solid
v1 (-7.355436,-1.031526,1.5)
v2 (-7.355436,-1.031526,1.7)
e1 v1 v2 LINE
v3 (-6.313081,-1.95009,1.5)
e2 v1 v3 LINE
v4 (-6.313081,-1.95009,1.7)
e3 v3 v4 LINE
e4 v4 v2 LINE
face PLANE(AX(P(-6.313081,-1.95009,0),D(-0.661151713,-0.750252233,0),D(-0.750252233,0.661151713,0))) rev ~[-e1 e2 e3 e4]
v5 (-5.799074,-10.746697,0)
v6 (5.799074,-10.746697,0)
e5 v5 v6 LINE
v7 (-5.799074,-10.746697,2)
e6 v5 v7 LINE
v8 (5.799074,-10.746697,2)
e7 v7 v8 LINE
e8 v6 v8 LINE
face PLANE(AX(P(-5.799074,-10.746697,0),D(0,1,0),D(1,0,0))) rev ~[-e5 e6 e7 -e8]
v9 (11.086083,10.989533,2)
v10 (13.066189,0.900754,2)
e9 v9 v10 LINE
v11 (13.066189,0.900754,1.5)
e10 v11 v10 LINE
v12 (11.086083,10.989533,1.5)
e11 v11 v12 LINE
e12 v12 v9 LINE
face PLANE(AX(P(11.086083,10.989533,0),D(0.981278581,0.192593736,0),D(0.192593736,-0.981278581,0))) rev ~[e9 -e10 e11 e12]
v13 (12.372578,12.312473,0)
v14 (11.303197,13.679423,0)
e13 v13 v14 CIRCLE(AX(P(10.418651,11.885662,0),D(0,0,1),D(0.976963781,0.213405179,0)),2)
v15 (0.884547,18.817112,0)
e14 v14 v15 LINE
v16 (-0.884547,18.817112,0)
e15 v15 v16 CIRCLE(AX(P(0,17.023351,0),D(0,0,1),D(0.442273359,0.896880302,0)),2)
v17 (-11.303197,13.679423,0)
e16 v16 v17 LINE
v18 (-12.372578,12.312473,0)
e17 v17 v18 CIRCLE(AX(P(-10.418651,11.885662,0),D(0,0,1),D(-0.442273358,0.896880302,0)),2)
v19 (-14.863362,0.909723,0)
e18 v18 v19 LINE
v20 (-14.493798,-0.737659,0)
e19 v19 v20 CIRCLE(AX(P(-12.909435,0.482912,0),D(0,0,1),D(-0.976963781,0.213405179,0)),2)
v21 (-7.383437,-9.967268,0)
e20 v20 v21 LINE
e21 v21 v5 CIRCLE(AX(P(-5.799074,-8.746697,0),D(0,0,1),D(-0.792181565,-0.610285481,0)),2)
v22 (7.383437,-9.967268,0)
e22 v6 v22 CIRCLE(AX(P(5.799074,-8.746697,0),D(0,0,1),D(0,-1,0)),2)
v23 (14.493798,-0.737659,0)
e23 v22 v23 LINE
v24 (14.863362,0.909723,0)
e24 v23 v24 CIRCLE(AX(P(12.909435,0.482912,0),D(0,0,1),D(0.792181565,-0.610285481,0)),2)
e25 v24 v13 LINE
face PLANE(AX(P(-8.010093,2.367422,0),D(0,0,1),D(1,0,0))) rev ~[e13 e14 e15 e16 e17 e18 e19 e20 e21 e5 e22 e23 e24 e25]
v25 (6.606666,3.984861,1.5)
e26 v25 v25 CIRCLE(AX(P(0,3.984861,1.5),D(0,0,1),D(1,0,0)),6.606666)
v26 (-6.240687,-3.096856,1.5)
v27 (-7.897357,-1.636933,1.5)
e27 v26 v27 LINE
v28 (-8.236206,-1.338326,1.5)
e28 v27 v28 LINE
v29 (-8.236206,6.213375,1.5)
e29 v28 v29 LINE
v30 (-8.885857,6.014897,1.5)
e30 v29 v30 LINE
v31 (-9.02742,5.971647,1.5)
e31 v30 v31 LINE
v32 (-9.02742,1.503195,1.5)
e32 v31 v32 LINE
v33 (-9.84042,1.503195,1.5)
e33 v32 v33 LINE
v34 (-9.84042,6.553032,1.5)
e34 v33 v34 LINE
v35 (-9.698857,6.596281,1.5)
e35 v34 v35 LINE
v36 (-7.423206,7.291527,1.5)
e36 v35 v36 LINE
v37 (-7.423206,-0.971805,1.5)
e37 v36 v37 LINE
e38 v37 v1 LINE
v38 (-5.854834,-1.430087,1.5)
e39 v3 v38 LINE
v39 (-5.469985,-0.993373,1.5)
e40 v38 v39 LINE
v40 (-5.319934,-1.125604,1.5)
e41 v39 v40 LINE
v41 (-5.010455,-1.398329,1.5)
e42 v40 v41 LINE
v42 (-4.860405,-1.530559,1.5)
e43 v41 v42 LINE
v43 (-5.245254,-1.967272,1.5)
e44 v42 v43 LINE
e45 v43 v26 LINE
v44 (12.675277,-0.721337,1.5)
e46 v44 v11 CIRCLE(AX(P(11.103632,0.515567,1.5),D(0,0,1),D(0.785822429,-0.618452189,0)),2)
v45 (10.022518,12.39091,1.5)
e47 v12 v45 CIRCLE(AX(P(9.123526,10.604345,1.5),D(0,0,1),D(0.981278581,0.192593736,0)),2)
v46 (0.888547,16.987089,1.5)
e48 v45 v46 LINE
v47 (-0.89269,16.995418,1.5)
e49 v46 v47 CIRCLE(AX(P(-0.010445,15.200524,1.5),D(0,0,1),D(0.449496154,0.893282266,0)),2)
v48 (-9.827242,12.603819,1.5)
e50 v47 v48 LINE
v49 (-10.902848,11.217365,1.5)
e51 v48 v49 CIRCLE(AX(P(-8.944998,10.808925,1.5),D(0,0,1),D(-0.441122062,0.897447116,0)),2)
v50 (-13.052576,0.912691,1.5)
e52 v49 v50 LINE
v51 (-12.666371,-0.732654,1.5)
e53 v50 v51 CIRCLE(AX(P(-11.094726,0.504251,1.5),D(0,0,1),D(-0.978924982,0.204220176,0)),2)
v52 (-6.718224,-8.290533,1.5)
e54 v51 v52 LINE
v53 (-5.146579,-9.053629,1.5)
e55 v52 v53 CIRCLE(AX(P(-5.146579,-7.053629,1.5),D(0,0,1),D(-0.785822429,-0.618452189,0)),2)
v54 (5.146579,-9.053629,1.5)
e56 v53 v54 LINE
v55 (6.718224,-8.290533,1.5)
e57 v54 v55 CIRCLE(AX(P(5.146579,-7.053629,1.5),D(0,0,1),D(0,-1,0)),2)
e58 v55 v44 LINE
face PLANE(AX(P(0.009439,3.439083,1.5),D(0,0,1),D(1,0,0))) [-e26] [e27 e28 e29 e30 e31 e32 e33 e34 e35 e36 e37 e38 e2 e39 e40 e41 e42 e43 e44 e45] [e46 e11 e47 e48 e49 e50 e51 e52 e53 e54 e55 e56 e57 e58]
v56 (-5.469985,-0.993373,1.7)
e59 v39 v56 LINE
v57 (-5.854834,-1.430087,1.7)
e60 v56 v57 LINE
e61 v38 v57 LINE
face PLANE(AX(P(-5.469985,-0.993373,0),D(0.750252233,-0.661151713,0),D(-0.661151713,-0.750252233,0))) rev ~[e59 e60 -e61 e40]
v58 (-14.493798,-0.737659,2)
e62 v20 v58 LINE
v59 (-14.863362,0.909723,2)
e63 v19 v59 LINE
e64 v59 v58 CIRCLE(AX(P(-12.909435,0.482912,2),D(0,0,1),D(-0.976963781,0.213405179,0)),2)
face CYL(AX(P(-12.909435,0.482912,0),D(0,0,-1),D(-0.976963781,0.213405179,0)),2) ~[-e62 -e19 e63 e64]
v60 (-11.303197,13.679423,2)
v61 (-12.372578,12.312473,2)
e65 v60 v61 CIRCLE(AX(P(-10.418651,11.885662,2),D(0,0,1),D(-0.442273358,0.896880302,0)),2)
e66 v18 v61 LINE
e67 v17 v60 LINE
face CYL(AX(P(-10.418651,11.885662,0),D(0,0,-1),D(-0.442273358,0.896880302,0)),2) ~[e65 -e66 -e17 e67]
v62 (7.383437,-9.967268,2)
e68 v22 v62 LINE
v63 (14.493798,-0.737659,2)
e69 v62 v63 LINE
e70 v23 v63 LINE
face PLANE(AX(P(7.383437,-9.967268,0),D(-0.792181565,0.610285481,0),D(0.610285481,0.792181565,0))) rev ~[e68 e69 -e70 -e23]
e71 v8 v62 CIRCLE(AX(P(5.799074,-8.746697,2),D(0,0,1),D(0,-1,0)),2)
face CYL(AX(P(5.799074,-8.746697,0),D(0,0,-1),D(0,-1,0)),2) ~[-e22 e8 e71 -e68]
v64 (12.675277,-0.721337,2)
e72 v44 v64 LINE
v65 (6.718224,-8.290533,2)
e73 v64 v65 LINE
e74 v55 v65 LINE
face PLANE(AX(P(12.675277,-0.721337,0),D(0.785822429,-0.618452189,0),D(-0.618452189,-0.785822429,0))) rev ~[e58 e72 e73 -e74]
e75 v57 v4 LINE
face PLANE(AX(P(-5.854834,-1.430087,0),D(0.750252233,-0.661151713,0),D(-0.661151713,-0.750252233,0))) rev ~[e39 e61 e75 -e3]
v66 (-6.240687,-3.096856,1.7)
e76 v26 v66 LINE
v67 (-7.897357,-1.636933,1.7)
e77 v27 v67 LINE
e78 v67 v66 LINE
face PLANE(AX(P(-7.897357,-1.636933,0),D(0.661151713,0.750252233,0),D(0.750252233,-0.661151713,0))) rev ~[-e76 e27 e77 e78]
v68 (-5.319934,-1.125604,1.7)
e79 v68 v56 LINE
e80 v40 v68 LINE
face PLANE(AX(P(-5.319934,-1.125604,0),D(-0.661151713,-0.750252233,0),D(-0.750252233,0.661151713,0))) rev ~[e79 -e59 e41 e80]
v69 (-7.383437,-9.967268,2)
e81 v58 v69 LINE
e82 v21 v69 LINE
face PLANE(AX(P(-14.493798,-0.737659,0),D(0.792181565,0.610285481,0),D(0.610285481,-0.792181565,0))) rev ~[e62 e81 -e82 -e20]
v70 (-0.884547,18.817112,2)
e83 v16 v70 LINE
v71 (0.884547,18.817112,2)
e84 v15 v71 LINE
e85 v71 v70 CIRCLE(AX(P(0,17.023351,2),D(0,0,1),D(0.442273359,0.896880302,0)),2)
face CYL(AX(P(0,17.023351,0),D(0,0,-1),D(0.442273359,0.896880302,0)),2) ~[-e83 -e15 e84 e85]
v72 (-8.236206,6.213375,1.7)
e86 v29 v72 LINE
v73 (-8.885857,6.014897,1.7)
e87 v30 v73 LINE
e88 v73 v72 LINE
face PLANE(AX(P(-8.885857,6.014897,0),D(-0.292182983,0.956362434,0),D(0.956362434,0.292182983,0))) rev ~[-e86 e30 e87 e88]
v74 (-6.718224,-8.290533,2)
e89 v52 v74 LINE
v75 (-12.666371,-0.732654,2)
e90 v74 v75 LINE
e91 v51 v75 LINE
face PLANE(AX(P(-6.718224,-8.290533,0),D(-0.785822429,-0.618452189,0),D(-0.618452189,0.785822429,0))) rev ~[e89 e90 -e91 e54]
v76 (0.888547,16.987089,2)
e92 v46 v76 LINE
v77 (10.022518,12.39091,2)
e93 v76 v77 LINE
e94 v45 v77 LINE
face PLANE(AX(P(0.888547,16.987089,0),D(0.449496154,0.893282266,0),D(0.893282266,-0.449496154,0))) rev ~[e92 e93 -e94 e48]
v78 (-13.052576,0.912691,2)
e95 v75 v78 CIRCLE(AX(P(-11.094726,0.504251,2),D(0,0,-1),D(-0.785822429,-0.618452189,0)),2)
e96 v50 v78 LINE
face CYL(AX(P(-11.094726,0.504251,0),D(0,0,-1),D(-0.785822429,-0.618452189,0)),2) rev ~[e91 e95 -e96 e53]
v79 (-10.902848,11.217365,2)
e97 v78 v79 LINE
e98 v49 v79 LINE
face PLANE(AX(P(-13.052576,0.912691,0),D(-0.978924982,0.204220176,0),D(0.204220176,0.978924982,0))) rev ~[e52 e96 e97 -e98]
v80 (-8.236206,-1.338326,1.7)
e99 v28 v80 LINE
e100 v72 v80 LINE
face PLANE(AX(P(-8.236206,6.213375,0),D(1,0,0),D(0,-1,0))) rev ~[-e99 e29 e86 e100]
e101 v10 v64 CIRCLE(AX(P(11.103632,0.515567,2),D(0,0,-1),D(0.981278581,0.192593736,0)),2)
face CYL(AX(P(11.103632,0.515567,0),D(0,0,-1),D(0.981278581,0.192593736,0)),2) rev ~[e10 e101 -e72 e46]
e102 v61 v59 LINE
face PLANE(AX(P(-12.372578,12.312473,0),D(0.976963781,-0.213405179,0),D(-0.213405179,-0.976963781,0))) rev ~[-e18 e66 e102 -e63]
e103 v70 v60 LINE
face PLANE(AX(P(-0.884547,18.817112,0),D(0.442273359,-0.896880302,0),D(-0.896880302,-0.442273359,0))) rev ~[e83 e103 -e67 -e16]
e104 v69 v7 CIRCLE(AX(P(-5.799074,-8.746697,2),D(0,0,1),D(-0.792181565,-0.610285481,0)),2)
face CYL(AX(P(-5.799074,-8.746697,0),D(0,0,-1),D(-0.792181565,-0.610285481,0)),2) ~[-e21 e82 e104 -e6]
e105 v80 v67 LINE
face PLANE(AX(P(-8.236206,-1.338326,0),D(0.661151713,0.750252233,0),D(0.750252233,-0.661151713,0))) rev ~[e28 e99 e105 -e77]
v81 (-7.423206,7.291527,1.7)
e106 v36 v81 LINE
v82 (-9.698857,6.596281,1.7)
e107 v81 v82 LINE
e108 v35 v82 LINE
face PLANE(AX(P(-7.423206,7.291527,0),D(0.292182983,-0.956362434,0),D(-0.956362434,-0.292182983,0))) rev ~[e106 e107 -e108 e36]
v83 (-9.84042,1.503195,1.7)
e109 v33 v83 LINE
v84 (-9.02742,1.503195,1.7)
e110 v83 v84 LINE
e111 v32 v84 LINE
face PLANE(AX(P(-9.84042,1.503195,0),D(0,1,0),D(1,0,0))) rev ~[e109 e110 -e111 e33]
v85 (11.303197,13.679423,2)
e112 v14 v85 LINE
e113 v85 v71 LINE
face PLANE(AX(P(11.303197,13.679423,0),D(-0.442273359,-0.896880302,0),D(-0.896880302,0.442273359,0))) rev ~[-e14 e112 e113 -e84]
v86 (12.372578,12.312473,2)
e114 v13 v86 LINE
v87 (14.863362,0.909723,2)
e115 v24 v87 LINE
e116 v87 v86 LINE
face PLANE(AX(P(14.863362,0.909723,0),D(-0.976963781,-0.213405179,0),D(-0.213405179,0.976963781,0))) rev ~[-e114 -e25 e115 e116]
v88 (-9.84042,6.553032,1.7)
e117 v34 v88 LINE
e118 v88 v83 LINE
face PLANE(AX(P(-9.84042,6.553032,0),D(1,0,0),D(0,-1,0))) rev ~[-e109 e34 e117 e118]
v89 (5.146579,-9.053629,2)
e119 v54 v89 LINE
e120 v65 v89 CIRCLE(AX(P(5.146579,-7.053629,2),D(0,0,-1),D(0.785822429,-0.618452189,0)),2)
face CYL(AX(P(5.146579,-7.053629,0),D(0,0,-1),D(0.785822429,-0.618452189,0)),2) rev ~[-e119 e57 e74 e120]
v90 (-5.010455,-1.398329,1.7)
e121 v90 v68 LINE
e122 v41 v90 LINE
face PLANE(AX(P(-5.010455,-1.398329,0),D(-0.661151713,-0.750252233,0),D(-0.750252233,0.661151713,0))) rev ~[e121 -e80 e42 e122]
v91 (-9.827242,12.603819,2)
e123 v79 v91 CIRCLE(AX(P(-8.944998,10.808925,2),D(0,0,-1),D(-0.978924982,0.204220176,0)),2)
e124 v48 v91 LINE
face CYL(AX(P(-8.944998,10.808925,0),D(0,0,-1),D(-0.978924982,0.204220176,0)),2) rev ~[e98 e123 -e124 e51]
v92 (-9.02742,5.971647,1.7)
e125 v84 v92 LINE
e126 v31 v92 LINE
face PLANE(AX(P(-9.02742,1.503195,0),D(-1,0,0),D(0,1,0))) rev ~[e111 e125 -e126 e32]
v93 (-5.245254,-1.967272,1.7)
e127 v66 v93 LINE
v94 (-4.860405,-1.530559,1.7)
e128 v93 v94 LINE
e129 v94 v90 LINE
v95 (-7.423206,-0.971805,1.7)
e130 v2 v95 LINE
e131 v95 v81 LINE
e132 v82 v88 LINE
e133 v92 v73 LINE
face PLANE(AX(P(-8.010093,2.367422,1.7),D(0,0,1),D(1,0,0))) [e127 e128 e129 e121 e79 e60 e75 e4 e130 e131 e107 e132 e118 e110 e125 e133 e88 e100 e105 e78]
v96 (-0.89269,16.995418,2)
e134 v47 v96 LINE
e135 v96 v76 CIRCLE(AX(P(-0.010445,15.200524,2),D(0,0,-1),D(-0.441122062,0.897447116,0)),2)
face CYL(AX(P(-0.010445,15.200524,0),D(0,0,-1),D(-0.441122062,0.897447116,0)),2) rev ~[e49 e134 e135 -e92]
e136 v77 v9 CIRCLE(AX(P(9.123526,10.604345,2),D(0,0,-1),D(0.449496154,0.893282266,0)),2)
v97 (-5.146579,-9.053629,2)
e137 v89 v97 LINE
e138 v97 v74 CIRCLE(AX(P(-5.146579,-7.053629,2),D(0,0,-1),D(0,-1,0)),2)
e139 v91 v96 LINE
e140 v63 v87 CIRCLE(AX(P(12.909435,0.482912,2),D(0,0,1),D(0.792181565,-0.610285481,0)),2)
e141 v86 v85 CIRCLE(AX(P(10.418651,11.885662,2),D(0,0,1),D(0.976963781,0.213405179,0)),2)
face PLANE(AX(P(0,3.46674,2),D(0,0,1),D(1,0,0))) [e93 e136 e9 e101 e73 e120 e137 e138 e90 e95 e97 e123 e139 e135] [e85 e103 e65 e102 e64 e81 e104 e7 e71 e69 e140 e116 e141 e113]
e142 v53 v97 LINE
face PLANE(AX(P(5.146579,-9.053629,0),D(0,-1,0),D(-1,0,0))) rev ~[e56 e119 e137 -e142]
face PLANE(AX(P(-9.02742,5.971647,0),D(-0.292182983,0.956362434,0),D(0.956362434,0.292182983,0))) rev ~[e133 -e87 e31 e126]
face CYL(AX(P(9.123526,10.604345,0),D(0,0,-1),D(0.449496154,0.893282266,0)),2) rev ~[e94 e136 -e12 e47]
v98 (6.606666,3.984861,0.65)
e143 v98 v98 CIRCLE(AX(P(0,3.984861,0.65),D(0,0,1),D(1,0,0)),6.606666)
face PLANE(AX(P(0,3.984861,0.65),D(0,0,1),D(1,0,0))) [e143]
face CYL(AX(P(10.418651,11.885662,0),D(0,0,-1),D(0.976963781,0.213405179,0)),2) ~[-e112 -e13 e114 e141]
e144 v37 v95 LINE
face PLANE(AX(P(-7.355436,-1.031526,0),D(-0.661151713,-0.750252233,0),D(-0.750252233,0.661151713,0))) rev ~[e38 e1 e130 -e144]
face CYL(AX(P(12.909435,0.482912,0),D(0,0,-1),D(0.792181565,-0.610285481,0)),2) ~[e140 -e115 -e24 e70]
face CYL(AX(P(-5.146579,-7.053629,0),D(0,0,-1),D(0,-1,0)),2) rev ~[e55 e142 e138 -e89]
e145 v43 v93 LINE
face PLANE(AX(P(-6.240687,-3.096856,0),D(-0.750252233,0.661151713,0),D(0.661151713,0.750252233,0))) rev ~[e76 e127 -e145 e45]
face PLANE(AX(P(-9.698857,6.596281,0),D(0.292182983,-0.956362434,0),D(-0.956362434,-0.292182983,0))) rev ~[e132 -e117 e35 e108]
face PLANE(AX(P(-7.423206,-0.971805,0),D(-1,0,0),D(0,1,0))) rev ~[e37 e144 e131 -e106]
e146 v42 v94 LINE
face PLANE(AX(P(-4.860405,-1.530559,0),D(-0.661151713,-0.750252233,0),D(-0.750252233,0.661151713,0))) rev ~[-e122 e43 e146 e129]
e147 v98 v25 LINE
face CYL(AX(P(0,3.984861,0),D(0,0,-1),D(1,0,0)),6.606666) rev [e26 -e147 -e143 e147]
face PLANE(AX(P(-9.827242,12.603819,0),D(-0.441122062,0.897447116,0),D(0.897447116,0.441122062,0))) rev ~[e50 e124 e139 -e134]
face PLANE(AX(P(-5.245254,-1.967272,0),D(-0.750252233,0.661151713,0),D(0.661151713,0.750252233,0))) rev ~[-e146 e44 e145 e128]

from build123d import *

# Parameters (mm, degrees)
F0_R     = 6.6066656701
F1_DEPTH = 1.5
F2_DEPTH = 2
F3_DEPTH = 0.65
F5_DEPTH = 1.7


# Not quite as in the source:
# - a feature names something its author has since deleted; it is built from what else it names


with BuildPart() as f1:
    # F0 (on Top) → F1 (new body)
    with BuildSketch(Plane.XY):
        with BuildLine():
            ThreePointArc((0.8885468305, 16.9870886264), (-0.0010928636, 17.2005022258), (-0.8926896019, 16.9954183263))
            Line((-0.8926896019, 16.9954183263), (-9.8272421593, 12.6038188933))
            ThreePointArc((-9.8272421593, 12.6038188933), (-10.5252186518, 12.034854024), (-10.9028479986, 11.2173650131))
            Line((-10.9028479986, 11.2173650131), (-13.052575898, 0.9126909889))
            ThreePointArc((-13.052575898, 0.9126909889), (-13.0418066326, 0.0472202699), (-12.6663707931, -0.732653741))
            Line((-12.6663707931, -0.732653741), (-6.7182242373, -8.2905330076))
            ThreePointArc((-6.7182242373, -8.2905330076), (-6.0201328246, -8.8527685293), (-5.146579379, -9.0536286299))
            Line((-5.146579379, -9.0536286299), (5.146579379, -9.0536286299))
            ThreePointArc((5.146579379, -9.0536286299), (6.0201328246, -8.8527685293), (6.7182242373, -8.2905330076))
            Line((6.7182242373, -8.2905330076), (12.6752768476, -0.7213374622))
            ThreePointArc((12.6752768476, -0.7213374622), (13.0479677297, 0.0469961856), (13.0661891506, 0.9007543878))
            Line((13.0661891506, 0.9007543878), (11.0860832533, 10.9895326776))
            ThreePointArc((11.0860832533, 10.9895326776), (10.7166616036, 11.8134437296), (10.0225184006, 12.3909097378))
            Line((10.0225184006, 12.3909097378), (0.8885468305, 16.9870886264))
        make_face()
        with Locations((0, 3.9848611549)):
            Circle(F0_R, mode=Mode.SUBTRACT)
    extrude(amount=F1_DEPTH)

    # F0 (on Top) → F2 (join)
    with BuildSketch(Plane.XY):
        with BuildLine():
            Line((-5.7990739843, -10.7466970864), (5.7990739843, -10.7466970864))
            ThreePointArc((5.7990739843, -10.7466970864), (6.6819267685, -10.541292016), (7.3834371144, -9.9672680479))
            Line((7.3834371144, -9.9672680479), (14.4937978518, -0.737658505))
            ThreePointArc((14.4937978518, -0.737658505), (14.8609319824, 0.0451243323), (14.8633622841, 0.9097228137))
            Line((14.8633622841, 0.9097228137), (12.3725781296, 12.3124728375))
            ThreePointArc((12.3725781296, 12.3124728375), (11.9938877885, 13.1179886127), (11.3031972843, 13.6794230844))
            Line((11.3031972843, 13.6794230844), (0.8845467171, 18.817111544))
            ThreePointArc((0.8845467171, 18.817111544), (0, 19.0233509398), (-0.8845467171, 18.817111544))
            Line((-0.8845467171, 18.817111544), (-11.3031972843, 13.6794230844))
            ThreePointArc((-11.3031972843, 13.6794230844), (-11.9938877885, 13.1179886127), (-12.3725781296, 12.3124728375))
            Line((-12.3725781296, 12.3124728375), (-14.8633622841, 0.9097228137))
            ThreePointArc((-14.8633622841, 0.9097228137), (-14.8609319824, 0.0451243323), (-14.4937978518, -0.737658505))
            Line((-14.4937978518, -0.737658505), (-7.3834371144, -9.9672680479))
            ThreePointArc((-7.3834371144, -9.9672680479), (-6.6819267685, -10.541292016), (-5.7990739843, -10.7466970864))
        make_face()
        with BuildLine():
            Line((-9.8272421593, 12.6038188933), (-0.8926896019, 16.9954183263))
            ThreePointArc((-0.8926896019, 16.9954183263), (-0.0010928636, 17.2005022258), (0.8885468305, 16.9870886264))
            Line((0.8885468305, 16.9870886264), (10.0225184006, 12.3909097378))
            ThreePointArc((10.0225184006, 12.3909097378), (10.7166616036, 11.8134437296), (11.0860832533, 10.9895326776))
            Line((11.0860832533, 10.9895326776), (13.0661891506, 0.9007543878))
            ThreePointArc((13.0661891506, 0.9007543878), (13.0479677297, 0.0469961856), (12.6752768476, -0.7213374622))
            Line((12.6752768476, -0.7213374622), (6.7182242373, -8.2905330076))
            ThreePointArc((6.7182242373, -8.2905330076), (6.0201328246, -8.8527685293), (5.146579379, -9.0536286299))
            Line((5.146579379, -9.0536286299), (-5.146579379, -9.0536286299))
            ThreePointArc((-5.146579379, -9.0536286299), (-6.0201328246, -8.8527685293), (-6.7182242373, -8.2905330076))
            Line((-6.7182242373, -8.2905330076), (-12.6663707931, -0.732653741))
            ThreePointArc((-12.6663707931, -0.732653741), (-13.0418066326, 0.0472202699), (-13.052575898, 0.9126909889))
            Line((-13.052575898, 0.9126909889), (-10.9028479986, 11.2173650131))
            ThreePointArc((-10.9028479986, 11.2173650131), (-10.5252186518, 12.034854024), (-9.8272421593, 12.6038188933))
        make_face(mode=Mode.SUBTRACT)
    extrude(amount=F2_DEPTH)

    # F0 (on Top) → F3 (join)
    with BuildSketch(Plane.XY):
        with Locations((0, 3.9848611549)):
            Circle(F0_R)
    extrude(amount=F3_DEPTH)

    # F4 (on Top) → F5 (join)
    with BuildSketch(Plane.XY):
        Polygon((-6.2406868358, -3.0968557074), (-5.2452536218, -1.9672723198), (-4.8604047071, -1.5305590028), (-5.0104551537, -1.3983286602), (-5.3199341997, -1.1256035787), (-5.4699846462, -0.9933732362), (-5.8548335609, -1.4300865532), (-6.3130810083, -1.9500900017), (-7.3554360868, -1.0315257971), (-7.4232057442, -0.9718045152), (-7.4232057442, -0.8814753506), (-7.4232057442, 7.291526825), (-9.6988570439, 6.5962814227), (-9.8404204473, 6.5530316922), (-9.8404204473, 6.405008936), (-9.8404204473, 1.7031954848), (-9.8404204473, 1.5031954848), (-9.6404204473, 1.5031954848), (-9.2274204473, 1.5031954848), (-9.0274204473, 1.5031954848), (-9.0274204473, 1.7031954848), (-9.0274204473, 5.8236241114), (-9.0274204473, 5.9716468677), (-8.8858570439, 6.0148965982), (-8.2362057442, 6.2133747566), (-8.2362057442, -0.8866803037), (-8.2362057442, -1.3383261269), (-7.897357457, -1.6369325365), align=None)
    extrude(amount=F5_DEPTH)


solid = f1.part
